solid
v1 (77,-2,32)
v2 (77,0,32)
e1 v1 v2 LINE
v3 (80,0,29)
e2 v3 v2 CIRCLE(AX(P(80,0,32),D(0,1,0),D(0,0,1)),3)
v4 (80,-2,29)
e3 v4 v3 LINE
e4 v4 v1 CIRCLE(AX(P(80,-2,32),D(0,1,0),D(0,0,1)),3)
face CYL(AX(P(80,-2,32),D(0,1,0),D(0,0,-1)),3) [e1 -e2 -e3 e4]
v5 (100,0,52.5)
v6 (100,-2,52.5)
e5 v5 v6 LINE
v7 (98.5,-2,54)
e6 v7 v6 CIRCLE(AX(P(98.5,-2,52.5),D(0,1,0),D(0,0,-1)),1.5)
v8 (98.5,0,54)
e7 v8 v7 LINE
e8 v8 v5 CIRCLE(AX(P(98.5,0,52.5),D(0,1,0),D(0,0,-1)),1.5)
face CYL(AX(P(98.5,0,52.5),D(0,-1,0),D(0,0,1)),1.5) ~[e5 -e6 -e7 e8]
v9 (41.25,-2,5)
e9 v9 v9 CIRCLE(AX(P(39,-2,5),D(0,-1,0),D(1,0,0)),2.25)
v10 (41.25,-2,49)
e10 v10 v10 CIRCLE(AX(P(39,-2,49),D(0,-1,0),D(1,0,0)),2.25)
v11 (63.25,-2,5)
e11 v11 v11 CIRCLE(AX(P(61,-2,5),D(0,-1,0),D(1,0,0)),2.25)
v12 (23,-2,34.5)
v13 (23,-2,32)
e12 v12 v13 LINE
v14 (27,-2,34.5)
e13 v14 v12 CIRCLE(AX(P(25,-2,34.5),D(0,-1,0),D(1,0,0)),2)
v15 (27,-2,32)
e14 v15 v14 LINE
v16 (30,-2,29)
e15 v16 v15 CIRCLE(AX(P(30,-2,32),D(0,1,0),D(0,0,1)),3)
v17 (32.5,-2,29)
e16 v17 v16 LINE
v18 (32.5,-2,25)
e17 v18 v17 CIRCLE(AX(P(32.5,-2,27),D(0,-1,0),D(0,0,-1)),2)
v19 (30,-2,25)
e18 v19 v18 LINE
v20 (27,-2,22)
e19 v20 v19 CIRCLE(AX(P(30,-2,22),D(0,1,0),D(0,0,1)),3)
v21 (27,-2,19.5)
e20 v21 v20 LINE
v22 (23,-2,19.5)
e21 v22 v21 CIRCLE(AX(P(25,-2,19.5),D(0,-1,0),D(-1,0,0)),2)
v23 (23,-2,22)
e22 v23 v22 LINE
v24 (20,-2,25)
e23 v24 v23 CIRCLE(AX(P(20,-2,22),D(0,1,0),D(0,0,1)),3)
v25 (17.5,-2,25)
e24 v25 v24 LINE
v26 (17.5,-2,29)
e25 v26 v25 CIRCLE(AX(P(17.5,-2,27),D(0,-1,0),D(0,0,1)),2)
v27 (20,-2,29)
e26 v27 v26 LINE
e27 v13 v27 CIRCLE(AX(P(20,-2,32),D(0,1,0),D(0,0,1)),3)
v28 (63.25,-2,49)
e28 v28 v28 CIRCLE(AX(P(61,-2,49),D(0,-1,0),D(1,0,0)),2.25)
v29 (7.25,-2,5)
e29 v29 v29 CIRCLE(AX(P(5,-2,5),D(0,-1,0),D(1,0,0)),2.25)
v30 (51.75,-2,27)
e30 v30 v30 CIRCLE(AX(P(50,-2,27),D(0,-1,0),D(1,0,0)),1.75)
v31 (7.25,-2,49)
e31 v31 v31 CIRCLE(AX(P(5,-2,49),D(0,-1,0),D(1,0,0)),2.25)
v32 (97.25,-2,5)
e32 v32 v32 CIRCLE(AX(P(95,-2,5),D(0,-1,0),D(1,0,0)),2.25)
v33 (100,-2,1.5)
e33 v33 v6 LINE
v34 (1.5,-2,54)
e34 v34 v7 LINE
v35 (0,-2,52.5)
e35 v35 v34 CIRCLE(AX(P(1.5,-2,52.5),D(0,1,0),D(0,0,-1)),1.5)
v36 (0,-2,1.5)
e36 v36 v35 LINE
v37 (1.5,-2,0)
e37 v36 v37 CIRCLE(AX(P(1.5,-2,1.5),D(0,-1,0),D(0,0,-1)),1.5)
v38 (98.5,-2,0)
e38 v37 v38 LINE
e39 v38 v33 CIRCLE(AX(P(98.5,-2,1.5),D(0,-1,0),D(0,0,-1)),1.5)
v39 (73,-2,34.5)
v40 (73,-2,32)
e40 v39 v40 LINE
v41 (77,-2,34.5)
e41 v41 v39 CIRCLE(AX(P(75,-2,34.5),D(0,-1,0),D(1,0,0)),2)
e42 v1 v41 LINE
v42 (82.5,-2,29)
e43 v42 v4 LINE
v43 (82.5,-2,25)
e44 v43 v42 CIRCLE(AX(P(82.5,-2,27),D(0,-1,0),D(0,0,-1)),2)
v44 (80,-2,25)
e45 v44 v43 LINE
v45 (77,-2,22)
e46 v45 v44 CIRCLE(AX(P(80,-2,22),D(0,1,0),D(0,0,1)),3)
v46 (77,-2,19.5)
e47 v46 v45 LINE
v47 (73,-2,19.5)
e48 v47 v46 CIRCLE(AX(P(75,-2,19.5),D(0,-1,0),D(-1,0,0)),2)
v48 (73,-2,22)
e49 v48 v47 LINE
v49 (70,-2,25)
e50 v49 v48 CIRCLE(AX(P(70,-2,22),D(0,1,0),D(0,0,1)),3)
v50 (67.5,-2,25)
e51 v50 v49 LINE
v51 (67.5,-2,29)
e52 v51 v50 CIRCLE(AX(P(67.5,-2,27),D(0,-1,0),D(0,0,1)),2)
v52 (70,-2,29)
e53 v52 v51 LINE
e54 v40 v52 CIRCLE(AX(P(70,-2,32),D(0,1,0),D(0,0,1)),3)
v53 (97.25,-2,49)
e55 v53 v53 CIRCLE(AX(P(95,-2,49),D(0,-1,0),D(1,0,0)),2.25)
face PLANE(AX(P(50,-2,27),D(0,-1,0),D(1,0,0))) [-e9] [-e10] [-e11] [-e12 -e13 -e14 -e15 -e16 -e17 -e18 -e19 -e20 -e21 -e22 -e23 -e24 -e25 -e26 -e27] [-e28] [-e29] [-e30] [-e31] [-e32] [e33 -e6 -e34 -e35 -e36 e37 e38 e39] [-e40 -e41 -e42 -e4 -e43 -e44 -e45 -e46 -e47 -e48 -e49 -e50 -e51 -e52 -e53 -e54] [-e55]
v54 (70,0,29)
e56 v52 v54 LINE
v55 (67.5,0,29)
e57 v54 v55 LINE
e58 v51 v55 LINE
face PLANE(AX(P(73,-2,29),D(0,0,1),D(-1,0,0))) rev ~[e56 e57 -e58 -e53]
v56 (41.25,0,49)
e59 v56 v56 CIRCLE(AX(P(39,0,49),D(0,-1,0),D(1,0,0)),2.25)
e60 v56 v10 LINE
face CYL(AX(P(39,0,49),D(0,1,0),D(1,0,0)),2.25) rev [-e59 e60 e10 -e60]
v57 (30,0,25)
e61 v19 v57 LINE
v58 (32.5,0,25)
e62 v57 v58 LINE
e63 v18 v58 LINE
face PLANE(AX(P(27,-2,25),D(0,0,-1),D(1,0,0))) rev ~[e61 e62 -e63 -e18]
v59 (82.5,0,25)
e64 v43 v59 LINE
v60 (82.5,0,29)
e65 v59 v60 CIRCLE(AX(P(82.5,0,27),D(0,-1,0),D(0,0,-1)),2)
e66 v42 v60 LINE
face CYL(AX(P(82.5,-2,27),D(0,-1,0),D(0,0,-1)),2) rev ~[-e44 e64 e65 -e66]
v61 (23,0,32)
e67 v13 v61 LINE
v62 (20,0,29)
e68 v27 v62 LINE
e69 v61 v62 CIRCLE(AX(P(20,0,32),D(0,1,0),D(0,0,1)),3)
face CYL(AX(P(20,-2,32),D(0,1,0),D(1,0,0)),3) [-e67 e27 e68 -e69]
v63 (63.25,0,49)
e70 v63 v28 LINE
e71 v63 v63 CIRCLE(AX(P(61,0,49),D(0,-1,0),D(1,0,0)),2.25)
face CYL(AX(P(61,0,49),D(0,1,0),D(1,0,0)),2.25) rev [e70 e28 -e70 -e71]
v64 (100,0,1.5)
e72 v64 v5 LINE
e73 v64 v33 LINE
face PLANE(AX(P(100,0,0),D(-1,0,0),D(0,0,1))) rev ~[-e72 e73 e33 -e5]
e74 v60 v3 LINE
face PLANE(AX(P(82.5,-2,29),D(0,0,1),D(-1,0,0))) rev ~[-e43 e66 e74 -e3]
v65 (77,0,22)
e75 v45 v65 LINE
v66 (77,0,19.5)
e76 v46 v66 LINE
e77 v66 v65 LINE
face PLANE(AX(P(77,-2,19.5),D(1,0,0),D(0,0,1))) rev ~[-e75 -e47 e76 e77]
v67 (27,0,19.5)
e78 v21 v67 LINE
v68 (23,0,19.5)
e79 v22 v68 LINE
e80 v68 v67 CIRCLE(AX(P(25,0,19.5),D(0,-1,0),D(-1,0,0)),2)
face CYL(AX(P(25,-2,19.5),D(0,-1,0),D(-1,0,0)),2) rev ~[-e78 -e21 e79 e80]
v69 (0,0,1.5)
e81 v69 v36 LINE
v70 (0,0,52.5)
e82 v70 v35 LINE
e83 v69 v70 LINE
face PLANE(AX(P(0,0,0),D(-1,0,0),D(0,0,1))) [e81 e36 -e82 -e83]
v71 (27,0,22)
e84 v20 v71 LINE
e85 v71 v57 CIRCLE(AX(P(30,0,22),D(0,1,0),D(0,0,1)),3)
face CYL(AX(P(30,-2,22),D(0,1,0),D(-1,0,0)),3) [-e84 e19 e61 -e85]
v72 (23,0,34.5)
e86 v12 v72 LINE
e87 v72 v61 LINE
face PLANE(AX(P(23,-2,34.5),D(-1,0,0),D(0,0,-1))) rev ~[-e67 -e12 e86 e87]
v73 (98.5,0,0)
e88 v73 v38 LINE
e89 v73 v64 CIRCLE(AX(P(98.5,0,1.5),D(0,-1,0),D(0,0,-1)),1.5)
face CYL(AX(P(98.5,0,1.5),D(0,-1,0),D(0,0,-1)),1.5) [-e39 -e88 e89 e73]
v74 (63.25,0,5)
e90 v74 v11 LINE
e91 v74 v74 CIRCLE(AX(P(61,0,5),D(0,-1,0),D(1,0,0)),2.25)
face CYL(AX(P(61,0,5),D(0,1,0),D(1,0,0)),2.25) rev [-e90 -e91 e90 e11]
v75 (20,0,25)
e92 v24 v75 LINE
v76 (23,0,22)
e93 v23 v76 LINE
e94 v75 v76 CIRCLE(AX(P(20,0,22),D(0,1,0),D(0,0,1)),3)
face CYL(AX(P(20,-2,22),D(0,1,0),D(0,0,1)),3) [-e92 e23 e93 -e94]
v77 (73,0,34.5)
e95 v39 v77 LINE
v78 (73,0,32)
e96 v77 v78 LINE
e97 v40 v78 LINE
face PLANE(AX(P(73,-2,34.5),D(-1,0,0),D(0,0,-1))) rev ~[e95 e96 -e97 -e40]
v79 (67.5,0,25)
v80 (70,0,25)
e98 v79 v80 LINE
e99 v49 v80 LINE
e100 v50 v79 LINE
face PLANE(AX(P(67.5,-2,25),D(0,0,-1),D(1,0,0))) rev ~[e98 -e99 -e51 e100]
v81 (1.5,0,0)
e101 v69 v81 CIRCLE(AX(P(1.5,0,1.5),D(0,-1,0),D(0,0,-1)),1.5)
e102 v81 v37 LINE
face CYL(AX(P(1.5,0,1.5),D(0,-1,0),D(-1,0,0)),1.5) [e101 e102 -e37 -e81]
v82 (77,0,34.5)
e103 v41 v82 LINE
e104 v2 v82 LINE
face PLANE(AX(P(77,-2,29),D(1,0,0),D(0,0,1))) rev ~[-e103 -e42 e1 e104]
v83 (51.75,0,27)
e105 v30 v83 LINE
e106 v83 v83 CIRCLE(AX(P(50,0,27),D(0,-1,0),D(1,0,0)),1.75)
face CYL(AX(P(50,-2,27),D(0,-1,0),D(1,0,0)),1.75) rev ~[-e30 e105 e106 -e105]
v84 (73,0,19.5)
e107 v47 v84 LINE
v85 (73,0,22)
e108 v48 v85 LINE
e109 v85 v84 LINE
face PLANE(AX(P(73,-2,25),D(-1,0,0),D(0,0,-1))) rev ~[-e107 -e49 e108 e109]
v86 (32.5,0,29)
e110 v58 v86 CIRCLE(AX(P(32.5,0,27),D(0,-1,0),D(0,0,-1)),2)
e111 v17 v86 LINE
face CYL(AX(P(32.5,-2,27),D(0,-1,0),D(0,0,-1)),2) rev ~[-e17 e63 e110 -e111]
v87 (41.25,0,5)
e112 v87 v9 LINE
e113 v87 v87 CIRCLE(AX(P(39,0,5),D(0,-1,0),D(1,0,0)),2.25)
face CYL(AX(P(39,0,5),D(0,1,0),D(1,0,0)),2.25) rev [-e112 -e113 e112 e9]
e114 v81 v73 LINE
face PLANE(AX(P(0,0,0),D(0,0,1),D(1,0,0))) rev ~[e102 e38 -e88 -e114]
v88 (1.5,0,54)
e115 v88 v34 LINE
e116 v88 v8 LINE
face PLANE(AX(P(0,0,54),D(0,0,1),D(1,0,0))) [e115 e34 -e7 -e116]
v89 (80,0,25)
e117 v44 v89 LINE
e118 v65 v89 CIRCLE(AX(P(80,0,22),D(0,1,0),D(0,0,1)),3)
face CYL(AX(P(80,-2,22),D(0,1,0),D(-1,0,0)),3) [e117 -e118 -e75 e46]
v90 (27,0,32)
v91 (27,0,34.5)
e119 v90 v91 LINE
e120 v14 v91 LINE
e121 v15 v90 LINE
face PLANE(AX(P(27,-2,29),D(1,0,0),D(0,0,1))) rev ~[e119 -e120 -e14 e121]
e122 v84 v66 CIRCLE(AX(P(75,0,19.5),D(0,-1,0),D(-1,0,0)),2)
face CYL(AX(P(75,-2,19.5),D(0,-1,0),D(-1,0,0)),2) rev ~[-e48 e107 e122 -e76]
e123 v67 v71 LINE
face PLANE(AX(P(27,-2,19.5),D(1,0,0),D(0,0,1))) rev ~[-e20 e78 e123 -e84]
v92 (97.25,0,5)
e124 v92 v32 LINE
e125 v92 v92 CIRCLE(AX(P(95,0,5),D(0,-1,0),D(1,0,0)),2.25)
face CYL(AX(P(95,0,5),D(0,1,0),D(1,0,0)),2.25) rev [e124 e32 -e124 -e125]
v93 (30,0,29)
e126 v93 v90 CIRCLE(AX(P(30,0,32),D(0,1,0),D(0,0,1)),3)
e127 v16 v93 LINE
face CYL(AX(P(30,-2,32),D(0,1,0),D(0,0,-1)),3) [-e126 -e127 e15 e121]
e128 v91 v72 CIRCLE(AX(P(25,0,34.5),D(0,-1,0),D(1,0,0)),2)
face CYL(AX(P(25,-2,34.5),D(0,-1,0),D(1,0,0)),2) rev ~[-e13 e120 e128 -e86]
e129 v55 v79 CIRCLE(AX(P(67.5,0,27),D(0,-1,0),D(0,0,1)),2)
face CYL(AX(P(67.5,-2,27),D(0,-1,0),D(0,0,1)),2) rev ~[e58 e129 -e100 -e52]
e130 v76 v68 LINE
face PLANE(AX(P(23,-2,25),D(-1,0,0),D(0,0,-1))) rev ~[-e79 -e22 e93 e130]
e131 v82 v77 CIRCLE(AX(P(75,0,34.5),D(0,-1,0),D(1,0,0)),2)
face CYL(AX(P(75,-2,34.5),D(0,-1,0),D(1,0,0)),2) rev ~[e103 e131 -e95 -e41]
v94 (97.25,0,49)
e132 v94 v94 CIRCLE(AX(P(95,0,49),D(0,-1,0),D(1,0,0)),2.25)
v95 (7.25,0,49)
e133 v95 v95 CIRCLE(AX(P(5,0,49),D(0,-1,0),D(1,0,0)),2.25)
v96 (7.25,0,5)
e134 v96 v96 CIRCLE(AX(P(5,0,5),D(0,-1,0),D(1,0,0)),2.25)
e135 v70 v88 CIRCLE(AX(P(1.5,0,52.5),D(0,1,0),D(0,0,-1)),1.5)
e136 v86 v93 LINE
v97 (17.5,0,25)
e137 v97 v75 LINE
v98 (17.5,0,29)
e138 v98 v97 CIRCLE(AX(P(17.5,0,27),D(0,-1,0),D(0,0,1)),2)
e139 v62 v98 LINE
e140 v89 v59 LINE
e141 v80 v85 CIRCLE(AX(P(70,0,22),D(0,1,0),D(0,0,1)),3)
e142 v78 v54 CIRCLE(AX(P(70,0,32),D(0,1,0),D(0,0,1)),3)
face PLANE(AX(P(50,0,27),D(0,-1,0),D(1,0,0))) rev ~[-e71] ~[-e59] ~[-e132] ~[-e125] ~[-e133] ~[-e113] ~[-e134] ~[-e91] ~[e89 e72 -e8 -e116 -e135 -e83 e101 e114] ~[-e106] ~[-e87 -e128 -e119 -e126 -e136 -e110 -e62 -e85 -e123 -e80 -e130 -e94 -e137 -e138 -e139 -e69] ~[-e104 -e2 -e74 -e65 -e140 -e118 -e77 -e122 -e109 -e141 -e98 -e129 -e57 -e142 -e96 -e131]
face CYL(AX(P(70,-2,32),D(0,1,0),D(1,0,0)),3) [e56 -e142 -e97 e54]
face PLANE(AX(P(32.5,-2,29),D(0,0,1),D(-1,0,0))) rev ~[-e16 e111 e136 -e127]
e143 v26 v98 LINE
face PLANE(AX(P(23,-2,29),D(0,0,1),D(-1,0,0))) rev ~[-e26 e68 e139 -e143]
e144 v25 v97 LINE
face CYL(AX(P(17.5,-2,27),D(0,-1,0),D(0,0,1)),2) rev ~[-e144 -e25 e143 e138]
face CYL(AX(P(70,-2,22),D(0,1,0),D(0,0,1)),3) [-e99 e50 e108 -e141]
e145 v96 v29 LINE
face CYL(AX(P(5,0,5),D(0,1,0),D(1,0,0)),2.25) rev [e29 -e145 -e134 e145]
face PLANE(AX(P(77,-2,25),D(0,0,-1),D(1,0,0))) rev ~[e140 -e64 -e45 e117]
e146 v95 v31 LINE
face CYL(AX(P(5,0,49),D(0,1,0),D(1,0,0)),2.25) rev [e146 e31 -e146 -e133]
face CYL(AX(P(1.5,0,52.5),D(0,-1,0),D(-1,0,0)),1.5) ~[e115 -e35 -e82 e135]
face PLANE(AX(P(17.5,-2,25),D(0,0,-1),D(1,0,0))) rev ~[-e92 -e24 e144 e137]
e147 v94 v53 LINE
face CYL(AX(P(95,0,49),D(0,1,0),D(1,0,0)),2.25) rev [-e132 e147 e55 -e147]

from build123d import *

# Parameters (mm, degrees)
F0_W     = 100
F0_H     = 54
F0_R     = 2.25
F1_DEPTH = 2
F2_W     = 2
F2_H     = 2
F2_R     = 1.75
F3_DEPTH = 2
F4_R     = 3
F5_R     = 1.5


# Not quite as in the source:
# - a feature names something its author has since deleted; it is built from what else it names


with BuildPart() as f1:
    # F0 (on Front) → F1 (new body)
    with BuildSketch(Plane.XZ):
        with Locations((50, 27)):
            Rectangle(F0_W, F0_H)
        with Locations((5, 5)):
            Circle(F0_R, mode=Mode.SUBTRACT)
        with Locations((39, 5)):
            Circle(F0_R, mode=Mode.SUBTRACT)
        with Locations((61, 5)):
            Circle(F0_R, mode=Mode.SUBTRACT)
        with Locations((95, 5)):
            Circle(F0_R, mode=Mode.SUBTRACT)
        with Locations((5, 49)):
            Circle(F0_R, mode=Mode.SUBTRACT)
        with Locations((39, 49)):
            Circle(F0_R, mode=Mode.SUBTRACT)
        with Locations((61, 49)):
            Circle(F0_R, mode=Mode.SUBTRACT)
        with Locations((95, 49)):
            Circle(F0_R, mode=Mode.SUBTRACT)
    extrude(amount=F1_DEPTH)

    # F2 (on face) → F3 (cut)
    with BuildSketch(Plane.XZ.offset(2)):
        with Locations((24, 28)):
            Rectangle(F2_W, F2_H)
        with BuildLine():
            Line((23, 25), (23, 27))
            Line((23, 27), (23, 29))
            Line((23, 29), (17.5, 29))
            ThreePointArc((17.5, 29), (15.5, 27), (17.5, 25))
            Line((17.5, 25), (23, 25))
        make_face()
        with Locations((24, 26)):
            Rectangle(F2_W, F2_H)
        with Locations((26, 28)):
            Rectangle(F2_W, F2_H)
        with Locations((26, 26)):
            Rectangle(F2_W, F2_H)
        with BuildLine():
            Line((23, 34.5), (23, 29))
            Line((23, 29), (25, 29))
            Line((25, 29), (27, 29))
            Line((27, 29), (27, 34.5))
            ThreePointArc((27, 34.5), (25, 36.5), (23, 34.5))
        make_face()
        with BuildLine():
            Line((25, 25), (23, 25))
            Line((23, 25), (23, 19.5))
            ThreePointArc((23, 19.5), (25, 17.5), (27, 19.5))
            Line((27, 19.5), (27, 25))
            Line((27, 25), (25, 25))
        make_face()
        with BuildLine():
            Line((27, 29), (27, 27))
            Line((27, 27), (27, 25))
            Line((27, 25), (32.5, 25))
            ThreePointArc((32.5, 25), (34.5, 27), (32.5, 29))
            Line((32.5, 29), (27, 29))
        make_face()
        with Locations((50, 27)):
            Circle(F2_R)
        with Locations((74, 28)):
            Rectangle(F2_W, F2_H)
        with BuildLine():
            Line((73, 25), (73, 27))
            Line((73, 27), (73, 29))
            Line((73, 29), (67.5, 29))
            ThreePointArc((67.5, 29), (65.5, 27), (67.5, 25))
            Line((67.5, 25), (73, 25))
        make_face()
        with Locations((74, 26)):
            Rectangle(F2_W, F2_H)
        with Locations((76, 28)):
            Rectangle(F2_W, F2_H)
        with Locations((76, 26)):
            Rectangle(F2_W, F2_H)
        with BuildLine():
            Line((73, 34.5), (73, 29))
            Line((73, 29), (75, 29))
            Line((75, 29), (77, 29))
            Line((77, 29), (77, 34.5))
            ThreePointArc((77, 34.5), (75, 36.5), (73, 34.5))
        make_face()
        with BuildLine():
            Line((75, 25), (73, 25))
            Line((73, 25), (73, 19.5))
            ThreePointArc((73, 19.5), (75, 17.5), (77, 19.5))
            Line((77, 19.5), (77, 25))
            Line((77, 25), (75, 25))
        make_face()
        with BuildLine():
            Line((77, 29), (77, 27))
            Line((77, 27), (77, 25))
            Line((77, 25), (82.5, 25))
            ThreePointArc((82.5, 25), (84.5, 27), (82.5, 29))
            Line((82.5, 29), (77, 29))
        make_face()
    extrude(amount=-F3_DEPTH, mode=Mode.SUBTRACT)

    # F4
    f4_edges = [f1.edges().sort_by_distance(p)[0] for p in [
        (23, -1, 29),
        (23, -1, 25),
        (27, -1, 25),
        (27, -1, 29),
        (73, -1, 29),
        (77, -1, 29),
        (77, -1, 25),
        (73, -1, 25),
    ]]
    fillet(f4_edges, radius=F4_R)

    # F5
    f5_edges = [f1.edges().sort_by_distance(p)[0] for p in [
        (0, -1, 54),
        (0, -1, 0),
        (100, -1, 54),
        (100, -1, 0),
    ]]
    fillet(f5_edges, radius=F5_R)


solid = f1.part
